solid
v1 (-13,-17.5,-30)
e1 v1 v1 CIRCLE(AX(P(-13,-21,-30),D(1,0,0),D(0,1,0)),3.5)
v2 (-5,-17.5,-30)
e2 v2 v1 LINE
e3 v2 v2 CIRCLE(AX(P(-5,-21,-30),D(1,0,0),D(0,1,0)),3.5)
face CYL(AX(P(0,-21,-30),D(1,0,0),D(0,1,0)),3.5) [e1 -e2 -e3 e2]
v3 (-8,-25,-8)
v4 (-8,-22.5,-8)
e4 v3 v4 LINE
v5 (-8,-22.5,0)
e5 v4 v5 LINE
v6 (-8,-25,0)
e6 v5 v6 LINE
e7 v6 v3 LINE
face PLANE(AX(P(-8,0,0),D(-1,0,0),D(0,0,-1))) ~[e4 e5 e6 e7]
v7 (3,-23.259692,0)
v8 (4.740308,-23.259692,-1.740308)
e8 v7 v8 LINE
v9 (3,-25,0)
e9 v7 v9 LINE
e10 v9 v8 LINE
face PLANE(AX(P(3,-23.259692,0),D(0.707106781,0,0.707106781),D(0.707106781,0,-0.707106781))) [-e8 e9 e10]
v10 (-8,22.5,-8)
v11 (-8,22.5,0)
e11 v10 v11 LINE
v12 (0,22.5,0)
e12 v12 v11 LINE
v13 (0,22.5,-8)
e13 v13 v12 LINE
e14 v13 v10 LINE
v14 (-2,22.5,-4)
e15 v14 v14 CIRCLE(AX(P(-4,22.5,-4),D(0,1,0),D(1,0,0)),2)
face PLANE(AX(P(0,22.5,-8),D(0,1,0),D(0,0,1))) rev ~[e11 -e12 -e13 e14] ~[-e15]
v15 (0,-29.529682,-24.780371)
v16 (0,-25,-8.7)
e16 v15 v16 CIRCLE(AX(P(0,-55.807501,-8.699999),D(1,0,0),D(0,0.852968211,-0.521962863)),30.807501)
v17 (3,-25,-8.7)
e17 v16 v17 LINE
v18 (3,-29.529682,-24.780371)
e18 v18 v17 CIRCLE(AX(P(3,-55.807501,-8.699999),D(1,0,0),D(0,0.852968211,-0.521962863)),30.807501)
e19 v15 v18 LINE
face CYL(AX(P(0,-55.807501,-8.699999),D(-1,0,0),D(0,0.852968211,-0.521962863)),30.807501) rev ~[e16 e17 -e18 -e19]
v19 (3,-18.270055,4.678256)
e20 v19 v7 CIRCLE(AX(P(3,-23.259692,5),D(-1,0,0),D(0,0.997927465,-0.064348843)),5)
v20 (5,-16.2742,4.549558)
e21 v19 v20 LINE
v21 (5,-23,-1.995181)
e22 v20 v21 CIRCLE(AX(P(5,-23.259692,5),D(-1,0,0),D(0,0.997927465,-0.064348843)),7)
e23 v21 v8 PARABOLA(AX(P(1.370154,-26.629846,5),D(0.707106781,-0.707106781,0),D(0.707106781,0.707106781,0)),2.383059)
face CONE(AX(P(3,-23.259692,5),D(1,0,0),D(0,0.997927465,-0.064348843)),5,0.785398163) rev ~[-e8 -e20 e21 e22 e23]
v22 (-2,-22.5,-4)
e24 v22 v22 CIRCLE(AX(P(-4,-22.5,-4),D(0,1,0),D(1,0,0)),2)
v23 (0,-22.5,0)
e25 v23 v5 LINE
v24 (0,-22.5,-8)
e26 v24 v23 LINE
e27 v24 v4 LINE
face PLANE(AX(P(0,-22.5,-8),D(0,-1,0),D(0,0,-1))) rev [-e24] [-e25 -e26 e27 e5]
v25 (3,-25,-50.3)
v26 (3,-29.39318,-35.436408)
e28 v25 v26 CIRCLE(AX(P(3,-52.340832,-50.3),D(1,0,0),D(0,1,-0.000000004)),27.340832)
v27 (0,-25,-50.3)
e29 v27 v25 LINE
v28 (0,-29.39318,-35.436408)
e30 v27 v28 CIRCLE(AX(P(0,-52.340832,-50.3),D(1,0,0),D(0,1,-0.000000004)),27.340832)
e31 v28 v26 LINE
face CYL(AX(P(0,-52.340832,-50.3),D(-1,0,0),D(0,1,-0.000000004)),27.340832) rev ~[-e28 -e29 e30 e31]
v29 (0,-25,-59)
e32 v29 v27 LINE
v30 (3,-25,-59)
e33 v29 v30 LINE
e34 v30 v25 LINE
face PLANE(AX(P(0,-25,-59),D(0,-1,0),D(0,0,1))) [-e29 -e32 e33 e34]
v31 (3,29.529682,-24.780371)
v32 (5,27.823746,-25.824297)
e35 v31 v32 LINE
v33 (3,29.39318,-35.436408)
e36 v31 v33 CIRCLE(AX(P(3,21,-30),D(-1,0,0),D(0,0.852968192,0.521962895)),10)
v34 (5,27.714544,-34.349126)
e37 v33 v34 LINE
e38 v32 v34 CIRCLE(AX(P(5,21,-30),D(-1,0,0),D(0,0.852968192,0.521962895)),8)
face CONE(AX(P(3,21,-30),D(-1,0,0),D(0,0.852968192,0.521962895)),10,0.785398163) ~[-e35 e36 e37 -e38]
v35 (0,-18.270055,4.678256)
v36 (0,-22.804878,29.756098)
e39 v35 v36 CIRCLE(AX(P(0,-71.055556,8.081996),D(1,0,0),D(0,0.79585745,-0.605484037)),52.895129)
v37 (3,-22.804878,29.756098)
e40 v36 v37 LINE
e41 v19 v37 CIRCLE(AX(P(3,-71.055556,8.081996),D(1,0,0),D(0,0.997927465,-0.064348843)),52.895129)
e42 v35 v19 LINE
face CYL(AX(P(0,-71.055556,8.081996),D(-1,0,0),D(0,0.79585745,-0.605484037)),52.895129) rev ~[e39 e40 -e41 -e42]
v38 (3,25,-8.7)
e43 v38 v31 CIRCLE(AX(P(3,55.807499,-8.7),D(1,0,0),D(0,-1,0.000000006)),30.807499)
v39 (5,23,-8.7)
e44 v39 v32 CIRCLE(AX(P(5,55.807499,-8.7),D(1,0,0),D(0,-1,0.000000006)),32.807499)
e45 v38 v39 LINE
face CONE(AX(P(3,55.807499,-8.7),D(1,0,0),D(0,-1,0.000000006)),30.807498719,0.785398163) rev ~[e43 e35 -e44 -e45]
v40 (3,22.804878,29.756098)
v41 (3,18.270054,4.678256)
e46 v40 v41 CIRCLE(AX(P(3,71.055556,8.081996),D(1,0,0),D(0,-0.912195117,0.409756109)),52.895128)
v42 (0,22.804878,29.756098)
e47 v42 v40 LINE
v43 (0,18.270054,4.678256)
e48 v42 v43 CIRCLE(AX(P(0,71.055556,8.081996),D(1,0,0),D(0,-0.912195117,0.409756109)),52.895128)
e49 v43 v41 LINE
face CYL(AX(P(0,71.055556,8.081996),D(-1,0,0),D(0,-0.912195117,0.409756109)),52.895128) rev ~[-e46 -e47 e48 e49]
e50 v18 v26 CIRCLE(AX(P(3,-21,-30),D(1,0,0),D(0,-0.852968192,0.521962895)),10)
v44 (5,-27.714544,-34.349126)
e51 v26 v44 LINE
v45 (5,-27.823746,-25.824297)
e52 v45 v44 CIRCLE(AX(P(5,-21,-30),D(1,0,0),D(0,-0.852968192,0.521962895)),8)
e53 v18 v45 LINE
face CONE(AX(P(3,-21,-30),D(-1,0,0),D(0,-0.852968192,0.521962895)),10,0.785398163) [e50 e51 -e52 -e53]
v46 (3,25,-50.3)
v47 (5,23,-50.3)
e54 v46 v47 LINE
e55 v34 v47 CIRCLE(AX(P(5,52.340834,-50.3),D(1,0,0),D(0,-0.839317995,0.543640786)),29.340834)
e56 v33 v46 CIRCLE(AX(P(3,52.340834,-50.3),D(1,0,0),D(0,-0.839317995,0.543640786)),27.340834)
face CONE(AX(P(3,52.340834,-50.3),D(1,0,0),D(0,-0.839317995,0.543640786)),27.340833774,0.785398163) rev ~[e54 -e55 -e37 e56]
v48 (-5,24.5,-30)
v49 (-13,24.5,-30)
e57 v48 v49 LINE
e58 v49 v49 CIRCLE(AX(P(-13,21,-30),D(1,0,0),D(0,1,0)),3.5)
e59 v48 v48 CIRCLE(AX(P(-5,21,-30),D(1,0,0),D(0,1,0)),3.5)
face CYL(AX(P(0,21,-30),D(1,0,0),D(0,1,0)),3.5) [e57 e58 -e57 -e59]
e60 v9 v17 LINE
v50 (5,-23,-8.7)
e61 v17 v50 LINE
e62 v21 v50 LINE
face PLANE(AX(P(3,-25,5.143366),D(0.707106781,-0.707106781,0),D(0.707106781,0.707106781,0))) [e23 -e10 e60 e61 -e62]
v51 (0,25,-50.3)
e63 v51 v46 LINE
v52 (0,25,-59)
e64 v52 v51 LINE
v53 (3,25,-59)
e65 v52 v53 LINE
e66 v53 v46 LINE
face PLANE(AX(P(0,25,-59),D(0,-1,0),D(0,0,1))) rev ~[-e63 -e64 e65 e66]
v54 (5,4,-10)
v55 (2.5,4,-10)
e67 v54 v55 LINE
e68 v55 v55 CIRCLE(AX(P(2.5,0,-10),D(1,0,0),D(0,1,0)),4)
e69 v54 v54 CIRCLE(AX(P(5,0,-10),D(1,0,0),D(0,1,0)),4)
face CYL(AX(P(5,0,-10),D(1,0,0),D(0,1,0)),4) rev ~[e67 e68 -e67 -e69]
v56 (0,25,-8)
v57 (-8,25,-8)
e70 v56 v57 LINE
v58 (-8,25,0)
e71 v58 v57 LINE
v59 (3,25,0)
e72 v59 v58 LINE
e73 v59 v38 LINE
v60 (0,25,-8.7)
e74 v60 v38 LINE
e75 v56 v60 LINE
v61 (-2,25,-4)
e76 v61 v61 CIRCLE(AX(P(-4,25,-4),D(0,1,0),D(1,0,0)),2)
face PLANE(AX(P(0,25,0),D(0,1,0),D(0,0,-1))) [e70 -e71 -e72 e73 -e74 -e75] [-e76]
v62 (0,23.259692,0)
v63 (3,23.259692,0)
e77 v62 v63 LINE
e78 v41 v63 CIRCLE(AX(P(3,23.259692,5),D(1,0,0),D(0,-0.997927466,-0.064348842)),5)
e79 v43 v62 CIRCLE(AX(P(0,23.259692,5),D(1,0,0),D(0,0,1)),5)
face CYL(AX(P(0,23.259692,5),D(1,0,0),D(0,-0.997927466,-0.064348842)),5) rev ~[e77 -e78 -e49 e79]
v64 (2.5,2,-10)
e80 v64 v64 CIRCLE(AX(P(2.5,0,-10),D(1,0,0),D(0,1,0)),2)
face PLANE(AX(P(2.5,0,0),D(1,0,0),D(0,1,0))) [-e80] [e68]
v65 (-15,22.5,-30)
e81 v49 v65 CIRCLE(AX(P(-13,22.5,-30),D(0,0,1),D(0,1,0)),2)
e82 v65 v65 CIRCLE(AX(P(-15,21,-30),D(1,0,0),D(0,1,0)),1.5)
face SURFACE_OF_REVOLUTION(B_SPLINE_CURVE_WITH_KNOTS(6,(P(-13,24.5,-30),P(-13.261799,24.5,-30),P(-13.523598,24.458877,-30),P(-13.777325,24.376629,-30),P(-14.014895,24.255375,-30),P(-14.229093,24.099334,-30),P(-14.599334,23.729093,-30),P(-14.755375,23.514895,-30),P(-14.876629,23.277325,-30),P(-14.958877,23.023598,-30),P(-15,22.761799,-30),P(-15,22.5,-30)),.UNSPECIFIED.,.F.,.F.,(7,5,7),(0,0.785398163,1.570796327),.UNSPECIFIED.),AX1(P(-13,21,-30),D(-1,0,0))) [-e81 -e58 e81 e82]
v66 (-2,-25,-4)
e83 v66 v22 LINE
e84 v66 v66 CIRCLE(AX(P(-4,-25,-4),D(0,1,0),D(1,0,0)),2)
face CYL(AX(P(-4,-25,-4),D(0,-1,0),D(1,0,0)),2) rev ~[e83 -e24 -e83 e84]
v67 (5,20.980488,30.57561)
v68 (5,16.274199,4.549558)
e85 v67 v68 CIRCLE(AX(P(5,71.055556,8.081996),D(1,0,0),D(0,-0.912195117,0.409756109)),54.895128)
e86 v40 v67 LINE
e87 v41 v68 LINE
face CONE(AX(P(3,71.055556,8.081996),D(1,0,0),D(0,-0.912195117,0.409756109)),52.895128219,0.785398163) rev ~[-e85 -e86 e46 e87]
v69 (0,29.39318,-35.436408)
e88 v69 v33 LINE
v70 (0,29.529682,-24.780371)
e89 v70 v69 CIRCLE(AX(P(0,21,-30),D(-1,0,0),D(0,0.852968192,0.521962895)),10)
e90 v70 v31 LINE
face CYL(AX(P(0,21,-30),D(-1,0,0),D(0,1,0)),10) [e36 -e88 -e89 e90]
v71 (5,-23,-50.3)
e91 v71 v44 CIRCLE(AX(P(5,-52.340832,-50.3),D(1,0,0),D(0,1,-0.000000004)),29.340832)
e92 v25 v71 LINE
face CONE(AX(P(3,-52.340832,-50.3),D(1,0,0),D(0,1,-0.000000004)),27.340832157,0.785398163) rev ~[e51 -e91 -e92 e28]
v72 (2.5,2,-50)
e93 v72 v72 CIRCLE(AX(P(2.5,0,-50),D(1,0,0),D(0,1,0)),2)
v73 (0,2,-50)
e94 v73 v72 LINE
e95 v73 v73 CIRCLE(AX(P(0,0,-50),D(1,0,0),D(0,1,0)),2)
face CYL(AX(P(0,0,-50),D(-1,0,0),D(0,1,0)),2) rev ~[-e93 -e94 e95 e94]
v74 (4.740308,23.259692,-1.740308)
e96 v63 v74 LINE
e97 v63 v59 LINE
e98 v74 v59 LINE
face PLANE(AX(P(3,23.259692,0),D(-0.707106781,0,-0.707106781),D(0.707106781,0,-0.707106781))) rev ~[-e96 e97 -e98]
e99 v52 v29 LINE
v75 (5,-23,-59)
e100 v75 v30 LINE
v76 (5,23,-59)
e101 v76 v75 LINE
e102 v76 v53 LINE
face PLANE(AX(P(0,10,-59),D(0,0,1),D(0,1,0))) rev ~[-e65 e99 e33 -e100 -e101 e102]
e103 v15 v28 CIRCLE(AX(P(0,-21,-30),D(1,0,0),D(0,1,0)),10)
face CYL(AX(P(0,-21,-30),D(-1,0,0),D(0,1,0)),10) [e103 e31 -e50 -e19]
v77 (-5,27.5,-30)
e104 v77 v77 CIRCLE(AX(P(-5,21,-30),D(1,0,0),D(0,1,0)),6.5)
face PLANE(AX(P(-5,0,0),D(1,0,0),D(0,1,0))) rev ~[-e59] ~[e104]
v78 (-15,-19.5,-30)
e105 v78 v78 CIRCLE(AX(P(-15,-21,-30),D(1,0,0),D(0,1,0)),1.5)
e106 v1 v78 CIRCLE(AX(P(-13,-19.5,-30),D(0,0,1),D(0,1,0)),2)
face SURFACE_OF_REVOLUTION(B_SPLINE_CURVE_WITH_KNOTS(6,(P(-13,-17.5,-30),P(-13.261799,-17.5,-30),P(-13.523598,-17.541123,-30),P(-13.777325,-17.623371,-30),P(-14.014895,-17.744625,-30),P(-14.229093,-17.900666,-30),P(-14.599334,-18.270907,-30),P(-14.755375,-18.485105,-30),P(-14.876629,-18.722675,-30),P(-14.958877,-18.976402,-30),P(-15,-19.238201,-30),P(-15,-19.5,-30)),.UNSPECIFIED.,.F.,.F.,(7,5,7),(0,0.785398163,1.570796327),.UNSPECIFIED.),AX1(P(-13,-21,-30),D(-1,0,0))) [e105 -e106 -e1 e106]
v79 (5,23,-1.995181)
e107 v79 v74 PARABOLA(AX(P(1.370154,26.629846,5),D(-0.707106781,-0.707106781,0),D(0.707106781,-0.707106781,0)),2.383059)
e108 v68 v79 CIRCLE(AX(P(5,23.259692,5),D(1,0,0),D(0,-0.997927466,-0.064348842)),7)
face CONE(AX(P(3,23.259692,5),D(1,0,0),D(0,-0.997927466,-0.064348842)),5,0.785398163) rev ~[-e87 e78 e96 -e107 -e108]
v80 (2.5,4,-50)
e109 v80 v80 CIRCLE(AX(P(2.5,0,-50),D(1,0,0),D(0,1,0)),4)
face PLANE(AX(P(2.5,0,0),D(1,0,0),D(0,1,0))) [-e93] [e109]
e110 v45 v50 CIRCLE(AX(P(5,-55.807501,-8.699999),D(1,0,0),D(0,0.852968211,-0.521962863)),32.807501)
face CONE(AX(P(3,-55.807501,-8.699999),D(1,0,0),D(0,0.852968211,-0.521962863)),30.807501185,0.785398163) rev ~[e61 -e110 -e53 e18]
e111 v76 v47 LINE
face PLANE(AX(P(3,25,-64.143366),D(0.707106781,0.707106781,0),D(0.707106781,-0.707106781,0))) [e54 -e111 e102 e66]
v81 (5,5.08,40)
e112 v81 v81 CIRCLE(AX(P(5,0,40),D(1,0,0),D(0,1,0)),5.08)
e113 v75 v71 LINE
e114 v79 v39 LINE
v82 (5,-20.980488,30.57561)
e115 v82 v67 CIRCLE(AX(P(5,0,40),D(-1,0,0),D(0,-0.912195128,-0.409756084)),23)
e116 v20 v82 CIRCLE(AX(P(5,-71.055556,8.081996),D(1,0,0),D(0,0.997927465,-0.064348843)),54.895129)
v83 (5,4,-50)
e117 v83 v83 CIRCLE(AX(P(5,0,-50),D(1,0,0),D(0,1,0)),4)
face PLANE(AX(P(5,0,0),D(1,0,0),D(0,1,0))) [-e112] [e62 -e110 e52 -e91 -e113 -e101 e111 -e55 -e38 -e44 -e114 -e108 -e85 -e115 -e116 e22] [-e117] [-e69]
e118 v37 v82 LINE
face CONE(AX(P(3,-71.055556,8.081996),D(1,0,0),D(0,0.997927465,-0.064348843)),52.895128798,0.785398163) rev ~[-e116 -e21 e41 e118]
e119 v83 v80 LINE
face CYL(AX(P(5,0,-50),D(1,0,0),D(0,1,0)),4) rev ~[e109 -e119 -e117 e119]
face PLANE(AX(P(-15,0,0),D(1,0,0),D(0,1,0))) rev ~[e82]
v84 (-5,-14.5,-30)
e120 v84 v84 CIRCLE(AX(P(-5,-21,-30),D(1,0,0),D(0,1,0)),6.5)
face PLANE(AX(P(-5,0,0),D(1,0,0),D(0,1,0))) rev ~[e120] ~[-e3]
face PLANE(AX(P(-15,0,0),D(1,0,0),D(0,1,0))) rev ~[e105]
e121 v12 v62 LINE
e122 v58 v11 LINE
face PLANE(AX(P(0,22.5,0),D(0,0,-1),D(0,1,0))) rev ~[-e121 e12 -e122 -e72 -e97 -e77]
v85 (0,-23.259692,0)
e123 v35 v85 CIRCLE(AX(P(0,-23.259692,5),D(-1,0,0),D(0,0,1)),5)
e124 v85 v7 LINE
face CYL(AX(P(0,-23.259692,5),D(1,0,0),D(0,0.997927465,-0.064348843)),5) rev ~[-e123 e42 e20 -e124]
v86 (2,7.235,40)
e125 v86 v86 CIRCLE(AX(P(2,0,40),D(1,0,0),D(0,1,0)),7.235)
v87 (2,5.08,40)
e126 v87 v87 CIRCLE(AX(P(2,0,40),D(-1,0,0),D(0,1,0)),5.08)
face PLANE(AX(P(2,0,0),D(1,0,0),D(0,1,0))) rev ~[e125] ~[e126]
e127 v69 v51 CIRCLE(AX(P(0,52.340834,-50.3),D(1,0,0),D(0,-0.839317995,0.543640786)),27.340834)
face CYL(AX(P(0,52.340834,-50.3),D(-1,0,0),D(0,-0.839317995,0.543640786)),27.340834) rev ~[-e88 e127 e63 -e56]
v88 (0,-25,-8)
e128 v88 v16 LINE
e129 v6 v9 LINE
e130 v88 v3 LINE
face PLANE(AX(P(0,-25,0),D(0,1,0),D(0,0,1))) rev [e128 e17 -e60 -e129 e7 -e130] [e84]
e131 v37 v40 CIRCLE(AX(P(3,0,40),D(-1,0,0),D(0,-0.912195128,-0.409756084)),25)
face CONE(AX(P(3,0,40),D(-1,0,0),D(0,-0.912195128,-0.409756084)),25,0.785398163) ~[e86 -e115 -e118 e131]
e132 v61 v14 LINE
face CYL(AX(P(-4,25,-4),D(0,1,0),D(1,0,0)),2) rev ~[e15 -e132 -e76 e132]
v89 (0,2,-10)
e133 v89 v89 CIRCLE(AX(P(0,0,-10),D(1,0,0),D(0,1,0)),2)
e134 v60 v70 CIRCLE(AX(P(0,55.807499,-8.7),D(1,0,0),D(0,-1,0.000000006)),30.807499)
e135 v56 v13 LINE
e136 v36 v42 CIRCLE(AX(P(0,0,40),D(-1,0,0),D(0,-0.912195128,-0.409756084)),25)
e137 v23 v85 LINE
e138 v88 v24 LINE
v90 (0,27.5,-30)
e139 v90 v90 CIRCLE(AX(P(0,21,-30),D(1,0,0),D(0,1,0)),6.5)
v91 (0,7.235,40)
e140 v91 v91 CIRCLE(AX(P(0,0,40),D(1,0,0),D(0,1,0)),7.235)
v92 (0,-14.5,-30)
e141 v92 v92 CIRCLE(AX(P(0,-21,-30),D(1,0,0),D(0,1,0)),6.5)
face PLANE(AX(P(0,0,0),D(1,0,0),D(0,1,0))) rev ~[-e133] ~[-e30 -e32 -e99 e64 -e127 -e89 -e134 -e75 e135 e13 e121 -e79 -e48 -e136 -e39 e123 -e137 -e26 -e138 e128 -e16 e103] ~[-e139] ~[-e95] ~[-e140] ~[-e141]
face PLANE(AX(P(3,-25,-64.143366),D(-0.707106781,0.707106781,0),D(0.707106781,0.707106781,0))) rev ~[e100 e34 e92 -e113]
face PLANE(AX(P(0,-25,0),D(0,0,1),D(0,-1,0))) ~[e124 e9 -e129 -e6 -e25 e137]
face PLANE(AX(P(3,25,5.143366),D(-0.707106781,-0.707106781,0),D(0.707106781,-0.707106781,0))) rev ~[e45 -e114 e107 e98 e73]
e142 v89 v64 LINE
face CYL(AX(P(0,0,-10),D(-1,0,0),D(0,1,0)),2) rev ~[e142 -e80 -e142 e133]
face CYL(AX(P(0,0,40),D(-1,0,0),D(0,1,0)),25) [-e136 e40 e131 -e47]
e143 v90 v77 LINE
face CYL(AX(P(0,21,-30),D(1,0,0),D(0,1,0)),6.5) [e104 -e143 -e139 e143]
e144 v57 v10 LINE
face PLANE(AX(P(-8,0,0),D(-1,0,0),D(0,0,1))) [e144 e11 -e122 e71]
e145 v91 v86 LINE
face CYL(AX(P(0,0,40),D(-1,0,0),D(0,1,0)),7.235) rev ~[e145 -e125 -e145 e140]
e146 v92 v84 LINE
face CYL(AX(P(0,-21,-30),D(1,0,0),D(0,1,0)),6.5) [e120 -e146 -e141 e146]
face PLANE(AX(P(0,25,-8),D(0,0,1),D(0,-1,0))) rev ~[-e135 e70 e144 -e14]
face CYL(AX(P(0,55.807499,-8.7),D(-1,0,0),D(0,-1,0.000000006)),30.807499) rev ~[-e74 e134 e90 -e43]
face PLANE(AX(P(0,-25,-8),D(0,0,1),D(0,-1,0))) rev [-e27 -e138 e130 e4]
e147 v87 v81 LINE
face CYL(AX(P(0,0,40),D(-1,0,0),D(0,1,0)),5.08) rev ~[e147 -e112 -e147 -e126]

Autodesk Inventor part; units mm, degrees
ref_plane "YZ Plane" through (0, 0, 0) normal (1, 0, 0) x (0, 1, 0)
ref_plane "XZ Plane" through (0, 0, 0) normal (0, 1, 0) x (-1, 0, 0)
ref_plane "XY Plane" through (0, 0, 0) normal (0, 0, 1) x (1, 0, 0)
sketch "Sketch1" plane through (0, 0, 0) normal (1, 0, 0) x (0, 1, 0)
  line L0 (0, 0) -> (0, -10) construction
  line L1 (0, -10) -> (0, -50) construction
  circle A0 centre (0, -10) radius 2
  circle A1 centre (0, -50) radius 2
  line L2 (10, 0) -> (10, -59)
  line L3 (10, -59) -> (0, -59)
  line L4 (0, -59) -> (-10, -59)
  line L5 (-10, -59) -> (-10, 0)
  line L6 (0, 0) -> (10, 0)
  line L7 (0, 0) -> (-10, 0)
  line L8 (0, -50) -> (0, -59) construction
  circle A2 centre (0, 40) radius 25
  line L9 (10, 0) -> (10, 10)
  line L10 (10, 10) -> (-10, 10)
  line L11 (-10, 10) -> (-10, 0)
  arc A3 (22.804878, 29.756098) -> (10, -30) centre (155.833333, -30) ccw
  arc A4 (-10, -30) -> (-22.804878, 29.756098) centre (-155.833333, -30) ccw
  line L12 (0, -30) -> (21, -30) construction
  line L13 (0, -30) -> (-21, -30) construction
  circle A5 centre (21, -30) radius 3.5
  circle A6 centre (-21, -30) radius 3.5
  circle A7 centre (21, -30) radius 10
  circle A8 centre (-21, -30) radius 10
  circle A9 centre (21, -30) radius 6.5
  circle A10 centre (-21, -30) radius 6.5
  line L14 (-10, -59) -> (-25, -59)
  line L15 (10, -59) -> (25, -59)
  arc A11 (-28.958574, -23.94516) -> (-22.804878, 29.756098) centre (-71.055556, 8.081996) ccw
  arc A12 (22.804878, 29.756098) -> (28.958574, -23.94516) centre (71.055556, 8.081996) ccw
  line L16 (0, 0) -> (15, 0)
  line L17 (10, 0) -> (25, 0)
  line L18 (25, -59) -> (25, -50.3)
  arc A13 (29.39318, -35.436408) -> (25, -50.3) centre (52.340833, -50.3) ccw
  line L19 (25, 0) -> (25, -8.7)
  arc A14 (25, -8.7) -> (29.529682, -24.780371) centre (55.8075, -8.7) ccw
  line L20 (-10, 0) -> (-25, 0)
  line L21 (-25, -59) -> (-25, -50.3)
  arc A15 (-25, -50.3) -> (-29.39318, -35.436408) centre (-52.340833, -50.3) ccw
  line L22 (-25, 0) -> (-25, -8.7)
  arc A16 (-29.529682, -24.780371) -> (-25, -8.7) centre (-55.8075, -8.7) ccw
  circle A17 centre (0, -50) radius 4
  circle A18 centre (0, -10) radius 4
  circle A19 centre (0, 40) radius 7.235
  circle A20 centre (0, 40) radius 5.08
  point P0 (-10, -30)
  point P1 (10, -30)
  point P2 (23.824594, -39.592793)
  point P3 (10, -63.33599)
  point P4 (-30.230769, -33.846154)
  point P5 (28.958574, -23.94516)
  point P6 (22.804878, 29.756098)
  point P7 (30.230769, -26.153846)
  point P8 (18.78151, 0)
  point P9 (-18.78151, 0)
  point P10 (-13.119069, 0)
  point P11 (-29.39318, -35.436408)
  dimension "d0" = 4
  dimension "d1" = 4
  dimension "d2" = 40
  dimension "d3" = 10
  dimension "d5" = 9
  dimension "d7" = 10
  dimension "d8" = 10
  dimension "d9" = 50
  dimension "d12" = 30
  dimension "d13" = 10
  dimension "d14" = 20
  dimension "d30" = 21
  dimension "d31" = 7
  dimension "d32" = 7
  dimension "d33" = 20
  dimension "d34" = 20
  dimension "d38" = 3
  dimension "d48" = 15
  dimension "d55" = 15
  dimension "d56" = 8.7
  dimension "d57" = 8.7
  dimension "d58" = 15
  dimension "d134" = 8
  dimension "d135" = 8
  dimension "d138" = 14.47
  dimension "d157" = 10.16
extrude "Extrusion1" add sketch "Sketch1" along normal blind 5 contours L16 A3 L2 | L2 L3 L4 L5 L7 L6 | L6 L7 L11 L10 L9 | L9 L10 L11 L20 A4 A2 A3 L16 | A3 L16 L17 A12 A7 A13 L18 L15 L2 | A3 A12 L17 L16 | L5 A4 L20 | A2 | L5 L14 L21 A15 A8 A11 L20 A4 | L20 A11 A4 | L17 L19 A14 A7 A12 | A11 A8 A16 L22 L20 | A7 | A8 | A5 | A6 | A9 | A10 | A17 | A18 | A19 | A20
fillet "Face Fillet1" radius 5 1 edges at (2.5, -18.7815, 0)
fillet "Face Fillet2" radius 5 1 edges at (2.5, 18.7815, 0)
extrude "Extrusion16" cut sketch "Sketch1" along normal up to surface (5 mm away) contours A20
extrude "Extrusion17" cut sketch "Sketch1" along normal blind 2 from surface at 0 contours A19 | A20
extrude "Extrusion11" cut sketch "Sketch1" against normal blind 2.5 from surface at 5 contours A17 | A18
extrude "Extrusion19" add sketch "Sketch1" against normal blind 15 contours A5 | A6
extrude "Extrusion20" add sketch "Sketch1" against normal blind 5 contours A9 | A10
fillet "Fillet4" radius 2 2 edges at (-15, 17.5, -30) (-15, -24.5, -30)
chamfer "Chamfer2" distance 2 angle 45 17 edges at (5, 0, 65) (5, -19.0046, 17.4944) (5, -19.8398, 1.3525) (5, -24.1298, 0) (5, 19.0046, 17.4944) (5, 19.8398, 1.3525) (5, 24.1298, 0) (5, 25, -4.35) (5, 26.154, -17.0531) (5, 30.9992, -30.1281) (5, 26.1213, -42.5504) (5, 25, -54.65) (5, -26.154, -17.0531) (5, -30.9992, -30.1281) (5, -26.1213, -42.5504) (5, -25, -54.65) (5, -25, -4.35)
sketch "Sketch15" plane through (0, 0, 0) normal (-1, 0, 0) x (0, 0, 1)
  line L0 (0, 25) -> (0, 23.259692)
  line L1 (0, 25) -> (-8, 25)
  line L2 (-8, 25) -> (-8, 22.5)
  line L3 (-8, 22.5) -> (0, 22.5)
  line L4 (0, 22.5) -> (0, 25)
  point P0 (0, 0)
  dimension "d175" = 8
  dimension "d176" = 2.5
extrude "Extrusion21" add sketch "Sketch15" along normal blind 8
sketch "Sketch16" plane through (0, 25, -8.7) normal (0, 1, 0) x (1, 0, 0)
  circle A0 centre (-4, -4.7) radius 2
  line L0 (-8, -8.7) -> (-8, -0.7) projected
  line L1 (-8, -8.7) -> (3, -8.7) projected
  point P0 (0, -8.7)
  dimension "d179" = 4
  dimension "d180" = 4
  dimension "d181" = 4
extrude "Extrusion22" cut sketch "Sketch16" against normal up to surface (2.5 mm away)
mirror "Mirror2" about plane through (0, 0, 0) normal (0, 1, 0) of "Extrusion22", "Extrusion21"
equation "\"d0\" = M4_HOLE_D"
equation "\"d1\" = d0"
equation "\"d14\" = 0.5 * d2"
equation "\"d32\" = d31"
equation "\"d34\" = d33"
equation "\"M4_HOLE_D\" = 4"
equation "\"M3_HOLE_D\" = 3"
equation "\"d88\" = 3"
properties part number "bearing_arm_3DPrint"
